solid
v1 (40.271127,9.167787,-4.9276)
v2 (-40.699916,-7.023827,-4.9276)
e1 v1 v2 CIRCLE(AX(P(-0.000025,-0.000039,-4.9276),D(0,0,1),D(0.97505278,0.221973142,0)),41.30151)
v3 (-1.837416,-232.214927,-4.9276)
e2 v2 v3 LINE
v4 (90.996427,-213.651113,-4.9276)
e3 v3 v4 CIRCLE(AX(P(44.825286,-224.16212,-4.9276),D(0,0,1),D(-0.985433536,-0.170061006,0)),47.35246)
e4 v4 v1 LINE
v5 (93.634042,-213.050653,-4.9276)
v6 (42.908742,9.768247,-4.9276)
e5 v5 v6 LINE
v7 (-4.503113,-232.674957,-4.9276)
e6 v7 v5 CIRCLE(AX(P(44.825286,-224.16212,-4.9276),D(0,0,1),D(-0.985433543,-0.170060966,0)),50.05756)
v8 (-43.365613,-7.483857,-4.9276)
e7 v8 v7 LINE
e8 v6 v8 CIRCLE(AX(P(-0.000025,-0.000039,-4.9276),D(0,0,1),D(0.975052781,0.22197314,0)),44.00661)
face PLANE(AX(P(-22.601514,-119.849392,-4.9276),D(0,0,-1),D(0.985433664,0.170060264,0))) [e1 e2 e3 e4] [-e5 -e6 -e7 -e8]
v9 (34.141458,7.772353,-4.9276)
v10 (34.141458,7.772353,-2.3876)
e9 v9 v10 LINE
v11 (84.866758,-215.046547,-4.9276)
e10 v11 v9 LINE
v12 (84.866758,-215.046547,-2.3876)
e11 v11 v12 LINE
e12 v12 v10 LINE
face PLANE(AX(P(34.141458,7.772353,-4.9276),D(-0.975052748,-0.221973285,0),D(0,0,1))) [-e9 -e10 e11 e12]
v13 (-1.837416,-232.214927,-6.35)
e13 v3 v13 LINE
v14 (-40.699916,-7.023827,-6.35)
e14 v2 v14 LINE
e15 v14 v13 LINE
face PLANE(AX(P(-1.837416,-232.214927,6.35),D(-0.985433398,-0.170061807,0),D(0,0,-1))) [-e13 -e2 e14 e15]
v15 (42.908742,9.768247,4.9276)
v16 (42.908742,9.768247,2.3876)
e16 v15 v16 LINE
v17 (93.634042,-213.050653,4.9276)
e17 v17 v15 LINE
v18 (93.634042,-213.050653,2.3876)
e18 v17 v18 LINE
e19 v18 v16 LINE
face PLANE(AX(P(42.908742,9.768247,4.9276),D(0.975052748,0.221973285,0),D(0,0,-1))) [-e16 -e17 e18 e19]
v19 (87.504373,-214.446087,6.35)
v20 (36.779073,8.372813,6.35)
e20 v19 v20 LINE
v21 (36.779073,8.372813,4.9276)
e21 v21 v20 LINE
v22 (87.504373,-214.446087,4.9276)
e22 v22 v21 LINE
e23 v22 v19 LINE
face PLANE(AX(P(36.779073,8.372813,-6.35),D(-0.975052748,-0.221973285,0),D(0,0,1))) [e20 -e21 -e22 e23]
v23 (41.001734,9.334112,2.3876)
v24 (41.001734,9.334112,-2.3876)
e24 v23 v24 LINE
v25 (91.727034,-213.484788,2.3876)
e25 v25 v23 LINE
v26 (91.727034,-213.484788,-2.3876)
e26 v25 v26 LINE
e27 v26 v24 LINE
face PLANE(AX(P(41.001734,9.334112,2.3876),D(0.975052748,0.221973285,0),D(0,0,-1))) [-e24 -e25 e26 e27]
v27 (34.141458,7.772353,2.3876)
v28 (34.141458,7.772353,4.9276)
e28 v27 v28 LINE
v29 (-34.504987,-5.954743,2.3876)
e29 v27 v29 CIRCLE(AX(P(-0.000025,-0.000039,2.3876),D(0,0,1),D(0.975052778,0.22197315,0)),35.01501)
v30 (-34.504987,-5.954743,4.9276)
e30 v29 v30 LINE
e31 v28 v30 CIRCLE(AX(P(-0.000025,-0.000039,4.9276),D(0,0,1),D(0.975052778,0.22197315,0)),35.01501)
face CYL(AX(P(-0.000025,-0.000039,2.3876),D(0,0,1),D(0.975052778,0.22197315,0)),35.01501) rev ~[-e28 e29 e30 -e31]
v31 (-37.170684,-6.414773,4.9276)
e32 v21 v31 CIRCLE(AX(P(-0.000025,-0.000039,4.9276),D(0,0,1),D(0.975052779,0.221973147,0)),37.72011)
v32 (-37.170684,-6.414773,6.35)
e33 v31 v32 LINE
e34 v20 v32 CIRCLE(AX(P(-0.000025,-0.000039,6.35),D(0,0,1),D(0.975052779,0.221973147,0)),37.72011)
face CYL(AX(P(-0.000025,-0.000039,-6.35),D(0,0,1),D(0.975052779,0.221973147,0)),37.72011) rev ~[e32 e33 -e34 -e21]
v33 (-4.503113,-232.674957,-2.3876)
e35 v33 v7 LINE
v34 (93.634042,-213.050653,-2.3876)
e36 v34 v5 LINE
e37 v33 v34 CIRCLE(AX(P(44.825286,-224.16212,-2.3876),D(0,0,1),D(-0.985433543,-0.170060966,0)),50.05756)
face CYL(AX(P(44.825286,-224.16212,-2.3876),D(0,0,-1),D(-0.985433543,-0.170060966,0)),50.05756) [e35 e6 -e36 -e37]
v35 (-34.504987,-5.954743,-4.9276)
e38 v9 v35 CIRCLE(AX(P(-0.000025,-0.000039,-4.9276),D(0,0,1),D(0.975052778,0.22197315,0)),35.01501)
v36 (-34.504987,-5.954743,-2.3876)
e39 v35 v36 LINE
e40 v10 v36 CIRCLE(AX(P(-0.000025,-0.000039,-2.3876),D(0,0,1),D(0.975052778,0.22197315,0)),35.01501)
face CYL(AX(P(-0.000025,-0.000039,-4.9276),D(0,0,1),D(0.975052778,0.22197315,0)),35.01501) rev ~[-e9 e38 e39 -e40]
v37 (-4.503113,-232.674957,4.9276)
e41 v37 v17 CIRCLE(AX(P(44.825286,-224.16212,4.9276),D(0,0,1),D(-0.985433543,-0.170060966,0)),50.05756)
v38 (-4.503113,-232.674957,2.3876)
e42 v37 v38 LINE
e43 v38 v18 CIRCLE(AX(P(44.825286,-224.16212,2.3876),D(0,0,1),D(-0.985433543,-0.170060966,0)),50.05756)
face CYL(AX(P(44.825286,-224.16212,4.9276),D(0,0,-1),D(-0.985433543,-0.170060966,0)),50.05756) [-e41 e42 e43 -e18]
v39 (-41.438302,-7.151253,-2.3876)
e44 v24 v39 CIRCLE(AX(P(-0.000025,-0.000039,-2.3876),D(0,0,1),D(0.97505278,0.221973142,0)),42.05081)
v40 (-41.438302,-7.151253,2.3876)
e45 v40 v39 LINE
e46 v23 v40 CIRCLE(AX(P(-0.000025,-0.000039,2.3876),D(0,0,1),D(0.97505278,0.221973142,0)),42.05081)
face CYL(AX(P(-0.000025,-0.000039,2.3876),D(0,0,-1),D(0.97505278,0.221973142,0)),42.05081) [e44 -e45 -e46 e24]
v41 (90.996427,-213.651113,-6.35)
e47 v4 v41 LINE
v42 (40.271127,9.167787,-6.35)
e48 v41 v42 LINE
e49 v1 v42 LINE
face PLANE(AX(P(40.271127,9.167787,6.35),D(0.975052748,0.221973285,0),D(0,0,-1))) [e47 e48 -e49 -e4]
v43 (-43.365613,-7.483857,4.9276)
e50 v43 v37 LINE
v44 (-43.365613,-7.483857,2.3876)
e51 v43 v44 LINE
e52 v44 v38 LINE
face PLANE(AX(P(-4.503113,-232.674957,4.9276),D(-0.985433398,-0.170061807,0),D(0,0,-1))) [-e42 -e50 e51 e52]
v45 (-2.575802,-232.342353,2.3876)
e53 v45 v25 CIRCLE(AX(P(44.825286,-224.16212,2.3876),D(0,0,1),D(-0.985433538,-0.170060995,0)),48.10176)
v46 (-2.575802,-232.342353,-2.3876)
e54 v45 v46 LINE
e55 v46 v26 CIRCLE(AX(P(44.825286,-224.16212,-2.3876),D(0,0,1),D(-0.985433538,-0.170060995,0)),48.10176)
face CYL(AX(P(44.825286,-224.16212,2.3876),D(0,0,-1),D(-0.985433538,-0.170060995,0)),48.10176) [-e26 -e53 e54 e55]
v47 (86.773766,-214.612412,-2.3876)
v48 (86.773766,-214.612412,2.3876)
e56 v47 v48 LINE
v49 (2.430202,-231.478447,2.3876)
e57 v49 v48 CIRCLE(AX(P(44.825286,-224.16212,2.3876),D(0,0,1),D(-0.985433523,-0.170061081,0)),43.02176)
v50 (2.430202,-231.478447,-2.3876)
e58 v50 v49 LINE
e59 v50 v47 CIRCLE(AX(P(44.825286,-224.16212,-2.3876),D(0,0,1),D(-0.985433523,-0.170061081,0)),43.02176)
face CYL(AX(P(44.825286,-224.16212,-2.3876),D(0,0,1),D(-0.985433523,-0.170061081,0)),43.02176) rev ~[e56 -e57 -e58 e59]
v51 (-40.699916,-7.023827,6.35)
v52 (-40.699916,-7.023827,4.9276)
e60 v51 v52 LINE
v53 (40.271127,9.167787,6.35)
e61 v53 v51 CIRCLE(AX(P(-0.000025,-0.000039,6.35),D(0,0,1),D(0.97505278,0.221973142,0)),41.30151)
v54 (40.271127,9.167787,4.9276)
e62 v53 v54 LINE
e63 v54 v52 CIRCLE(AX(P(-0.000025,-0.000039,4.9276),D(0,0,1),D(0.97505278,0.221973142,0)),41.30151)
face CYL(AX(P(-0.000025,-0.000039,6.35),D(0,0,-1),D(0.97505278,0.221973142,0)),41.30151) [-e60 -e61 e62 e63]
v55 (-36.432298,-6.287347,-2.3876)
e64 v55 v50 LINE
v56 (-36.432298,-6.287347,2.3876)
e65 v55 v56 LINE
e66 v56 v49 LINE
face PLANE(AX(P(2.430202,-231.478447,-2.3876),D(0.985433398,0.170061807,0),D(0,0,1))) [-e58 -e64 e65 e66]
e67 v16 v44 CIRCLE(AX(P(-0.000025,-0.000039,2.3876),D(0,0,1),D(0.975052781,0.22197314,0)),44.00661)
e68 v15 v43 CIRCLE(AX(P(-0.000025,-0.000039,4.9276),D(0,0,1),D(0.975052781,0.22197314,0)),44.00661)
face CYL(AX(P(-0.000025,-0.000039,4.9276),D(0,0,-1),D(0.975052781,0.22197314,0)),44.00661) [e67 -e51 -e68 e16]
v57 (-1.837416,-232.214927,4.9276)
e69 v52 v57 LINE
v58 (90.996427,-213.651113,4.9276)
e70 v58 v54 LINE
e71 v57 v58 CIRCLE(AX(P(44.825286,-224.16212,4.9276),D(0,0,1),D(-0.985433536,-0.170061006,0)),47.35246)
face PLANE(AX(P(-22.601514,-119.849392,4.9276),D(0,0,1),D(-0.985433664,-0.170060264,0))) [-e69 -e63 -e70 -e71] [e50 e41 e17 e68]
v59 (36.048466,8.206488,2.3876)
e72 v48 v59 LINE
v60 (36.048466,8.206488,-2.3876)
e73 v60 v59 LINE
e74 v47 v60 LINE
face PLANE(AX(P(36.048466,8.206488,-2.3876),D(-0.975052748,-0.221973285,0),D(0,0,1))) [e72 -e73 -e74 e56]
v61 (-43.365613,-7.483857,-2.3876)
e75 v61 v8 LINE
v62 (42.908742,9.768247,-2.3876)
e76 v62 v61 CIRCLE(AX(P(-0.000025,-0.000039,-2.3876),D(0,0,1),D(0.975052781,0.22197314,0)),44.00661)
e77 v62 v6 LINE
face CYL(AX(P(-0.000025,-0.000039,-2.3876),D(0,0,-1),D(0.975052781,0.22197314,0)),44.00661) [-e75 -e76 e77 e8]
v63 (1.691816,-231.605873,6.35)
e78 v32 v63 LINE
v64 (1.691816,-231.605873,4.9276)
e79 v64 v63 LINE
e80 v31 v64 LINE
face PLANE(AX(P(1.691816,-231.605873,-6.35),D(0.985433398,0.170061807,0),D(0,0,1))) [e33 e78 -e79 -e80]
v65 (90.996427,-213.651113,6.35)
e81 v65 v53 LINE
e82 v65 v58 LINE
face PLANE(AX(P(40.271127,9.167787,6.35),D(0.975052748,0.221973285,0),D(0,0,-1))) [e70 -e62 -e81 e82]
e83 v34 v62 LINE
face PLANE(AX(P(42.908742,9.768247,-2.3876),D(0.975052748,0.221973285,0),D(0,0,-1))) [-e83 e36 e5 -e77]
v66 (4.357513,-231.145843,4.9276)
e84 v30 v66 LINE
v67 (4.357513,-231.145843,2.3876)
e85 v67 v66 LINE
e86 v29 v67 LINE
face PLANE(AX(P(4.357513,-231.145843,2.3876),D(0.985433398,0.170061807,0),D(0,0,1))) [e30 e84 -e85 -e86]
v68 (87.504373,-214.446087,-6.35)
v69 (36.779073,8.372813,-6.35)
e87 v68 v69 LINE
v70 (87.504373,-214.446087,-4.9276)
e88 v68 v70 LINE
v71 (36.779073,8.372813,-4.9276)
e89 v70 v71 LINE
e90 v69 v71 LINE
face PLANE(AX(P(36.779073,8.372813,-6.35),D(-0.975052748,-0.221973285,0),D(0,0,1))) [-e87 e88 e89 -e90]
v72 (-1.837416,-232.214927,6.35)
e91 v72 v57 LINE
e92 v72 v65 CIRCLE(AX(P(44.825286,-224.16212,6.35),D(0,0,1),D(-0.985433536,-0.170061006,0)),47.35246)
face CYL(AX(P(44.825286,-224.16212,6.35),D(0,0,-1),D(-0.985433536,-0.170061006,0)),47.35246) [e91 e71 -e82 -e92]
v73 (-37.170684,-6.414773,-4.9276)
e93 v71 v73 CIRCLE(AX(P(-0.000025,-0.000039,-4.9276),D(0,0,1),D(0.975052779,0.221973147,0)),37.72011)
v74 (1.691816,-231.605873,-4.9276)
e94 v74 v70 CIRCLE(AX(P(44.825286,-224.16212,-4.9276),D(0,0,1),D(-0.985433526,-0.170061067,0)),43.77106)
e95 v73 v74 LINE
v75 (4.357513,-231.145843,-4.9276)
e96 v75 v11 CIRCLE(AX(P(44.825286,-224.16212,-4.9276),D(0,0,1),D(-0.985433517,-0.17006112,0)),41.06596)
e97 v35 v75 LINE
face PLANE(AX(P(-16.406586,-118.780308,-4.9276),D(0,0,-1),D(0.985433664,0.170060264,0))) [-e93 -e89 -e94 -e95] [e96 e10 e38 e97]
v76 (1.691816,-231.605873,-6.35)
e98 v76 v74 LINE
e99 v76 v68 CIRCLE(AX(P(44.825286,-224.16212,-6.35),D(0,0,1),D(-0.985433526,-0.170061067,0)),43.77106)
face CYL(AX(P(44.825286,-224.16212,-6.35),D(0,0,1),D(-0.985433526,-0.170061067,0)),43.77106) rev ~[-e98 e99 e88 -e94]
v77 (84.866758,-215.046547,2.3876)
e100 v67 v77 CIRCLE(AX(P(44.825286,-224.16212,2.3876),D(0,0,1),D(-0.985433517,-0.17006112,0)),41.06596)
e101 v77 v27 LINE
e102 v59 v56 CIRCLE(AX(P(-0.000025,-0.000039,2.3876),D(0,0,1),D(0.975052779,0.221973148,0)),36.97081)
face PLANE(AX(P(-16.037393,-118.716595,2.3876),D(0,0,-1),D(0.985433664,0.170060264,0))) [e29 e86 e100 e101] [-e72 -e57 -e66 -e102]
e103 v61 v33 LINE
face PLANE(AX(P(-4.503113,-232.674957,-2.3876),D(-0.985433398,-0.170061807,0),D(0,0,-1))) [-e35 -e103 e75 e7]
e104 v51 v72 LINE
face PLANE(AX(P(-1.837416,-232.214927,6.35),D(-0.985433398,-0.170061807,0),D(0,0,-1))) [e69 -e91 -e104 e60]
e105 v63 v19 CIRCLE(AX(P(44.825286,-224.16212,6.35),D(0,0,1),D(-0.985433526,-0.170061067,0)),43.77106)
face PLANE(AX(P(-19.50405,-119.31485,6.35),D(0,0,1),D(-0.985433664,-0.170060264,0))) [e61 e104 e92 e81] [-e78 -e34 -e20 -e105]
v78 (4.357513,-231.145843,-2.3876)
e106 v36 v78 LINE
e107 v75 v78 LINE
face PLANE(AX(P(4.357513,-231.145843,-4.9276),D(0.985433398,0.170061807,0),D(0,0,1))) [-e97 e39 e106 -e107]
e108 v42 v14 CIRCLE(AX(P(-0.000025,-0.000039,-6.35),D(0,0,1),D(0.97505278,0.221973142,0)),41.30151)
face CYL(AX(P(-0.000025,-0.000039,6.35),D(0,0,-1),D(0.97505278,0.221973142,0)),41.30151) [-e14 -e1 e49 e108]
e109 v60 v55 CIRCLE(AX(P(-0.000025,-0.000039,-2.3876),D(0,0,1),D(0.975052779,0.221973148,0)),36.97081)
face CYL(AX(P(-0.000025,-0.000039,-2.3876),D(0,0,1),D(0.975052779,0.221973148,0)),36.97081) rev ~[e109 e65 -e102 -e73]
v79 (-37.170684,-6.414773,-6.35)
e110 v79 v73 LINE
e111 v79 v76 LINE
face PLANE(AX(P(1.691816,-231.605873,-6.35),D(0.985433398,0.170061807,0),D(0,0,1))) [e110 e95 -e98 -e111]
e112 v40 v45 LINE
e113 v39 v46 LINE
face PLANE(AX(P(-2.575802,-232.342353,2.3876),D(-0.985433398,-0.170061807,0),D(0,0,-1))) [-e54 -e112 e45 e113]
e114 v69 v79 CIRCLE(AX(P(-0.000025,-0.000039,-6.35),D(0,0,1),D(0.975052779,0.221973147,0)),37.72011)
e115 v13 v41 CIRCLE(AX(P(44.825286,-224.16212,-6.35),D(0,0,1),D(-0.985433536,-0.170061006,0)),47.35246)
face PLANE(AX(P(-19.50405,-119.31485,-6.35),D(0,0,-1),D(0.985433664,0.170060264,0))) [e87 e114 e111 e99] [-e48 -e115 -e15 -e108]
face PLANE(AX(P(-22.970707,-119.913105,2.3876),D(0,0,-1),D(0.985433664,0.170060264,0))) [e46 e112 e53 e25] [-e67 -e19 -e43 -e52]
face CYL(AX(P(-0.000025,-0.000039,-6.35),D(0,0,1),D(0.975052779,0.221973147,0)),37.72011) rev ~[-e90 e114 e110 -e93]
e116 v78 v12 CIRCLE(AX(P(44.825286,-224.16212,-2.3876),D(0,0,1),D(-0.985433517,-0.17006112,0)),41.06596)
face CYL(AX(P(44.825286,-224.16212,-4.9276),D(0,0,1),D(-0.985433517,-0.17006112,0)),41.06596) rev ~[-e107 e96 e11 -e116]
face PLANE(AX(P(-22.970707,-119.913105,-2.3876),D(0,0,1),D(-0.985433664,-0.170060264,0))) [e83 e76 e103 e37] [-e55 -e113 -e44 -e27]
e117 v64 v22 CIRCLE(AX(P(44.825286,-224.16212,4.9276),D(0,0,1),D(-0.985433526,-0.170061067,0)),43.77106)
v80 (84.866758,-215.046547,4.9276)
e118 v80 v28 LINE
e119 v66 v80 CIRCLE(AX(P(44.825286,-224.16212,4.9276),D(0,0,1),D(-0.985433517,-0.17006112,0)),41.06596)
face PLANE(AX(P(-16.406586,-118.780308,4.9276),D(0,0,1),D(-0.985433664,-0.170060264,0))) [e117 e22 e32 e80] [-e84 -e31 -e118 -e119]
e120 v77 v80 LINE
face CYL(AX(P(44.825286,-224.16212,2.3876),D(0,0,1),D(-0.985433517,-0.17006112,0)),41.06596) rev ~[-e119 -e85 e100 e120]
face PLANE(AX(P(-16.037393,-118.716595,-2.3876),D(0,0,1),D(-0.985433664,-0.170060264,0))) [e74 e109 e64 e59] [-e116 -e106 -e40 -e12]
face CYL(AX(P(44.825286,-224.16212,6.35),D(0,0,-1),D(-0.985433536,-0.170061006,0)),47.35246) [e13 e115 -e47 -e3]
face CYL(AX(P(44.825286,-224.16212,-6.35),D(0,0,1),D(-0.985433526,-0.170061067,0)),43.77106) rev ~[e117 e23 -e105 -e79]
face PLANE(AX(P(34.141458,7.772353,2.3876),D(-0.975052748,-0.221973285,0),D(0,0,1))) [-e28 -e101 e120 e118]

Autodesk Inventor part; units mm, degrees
ref_plane "Work Plane2" through (44.8253, -224.1621, 0) normal (-1, 0, 0) x (0, 0, 1)
ref_plane "Work Plane3" through (0, 0, 0) normal (0.0925318, -0.9957097, 0) x (0, 0, 1)
sketch "Path" plane through (0, 0, 0) normal (0, 0, 1) x (1, 0, 0)
  arc A0 (-0.0728, -231.9104) -> (89.2504, -214.0486) centre (44.8253, -224.1621) ccw
  arc A1 (38.5251, 8.7703) -> (-38.9353, -6.7193) centre (0, 0) ccw
  line L0 (38.5251, 8.7703) -> (89.2504, -214.0486)
  line L1 (-0.0728, -231.9104) -> (-38.9353, -6.7193)
  dimension "d31" = 8.9916
ref_plane "Section Plane" through (89.2504, -214.0486, 0) normal (-0.2219731, 0.9750528, 0) x (0, 0, 1)
sketch "Section Sketch" plane through (89.2504, -214.0486, 0) normal (-0.2219731, 0.9750528, 0) x (0, 0, 1)
  line L0 (-6.35, -1.7907) -> (6.35, -1.7907)
  line L1 (6.35, -1.7907) -> (6.35, 1.7907)
  line L2 (6.35, 1.7907) -> (-6.35, 1.7907)
  line L3 (-6.35, 1.7907) -> (-6.35, -1.7907)
  line L4 (-2.3876, -2.54) -> (2.3876, -2.54)
  line L5 (2.3876, -2.54) -> (2.3876, 2.54)
  line L6 (2.3876, 2.54) -> (-2.3876, 2.54)
  line L7 (-2.3876, 2.54) -> (-2.3876, -2.54)
  line L8 (-2.3876, 0) -> (2.3876, 0) construction
  line L9 (-4.9276, -4.4958) -> (-2.3876, -4.4958)
  line L10 (-2.3876, -4.4958) -> (-2.3876, 4.4958)
  line L11 (-2.3876, 4.4958) -> (-4.9276, 4.4958)
  line L12 (-4.9276, 4.4958) -> (-4.9276, -4.4958)
  line L13 (2.3876, -4.4958) -> (4.9276, -4.4958)
  line L14 (4.9276, -4.4958) -> (4.9276, 4.4958)
  line L15 (4.9276, 4.4958) -> (2.3876, 4.4958)
  line L16 (2.3876, 4.4958) -> (2.3876, -4.4958)
  line L17 (-6.35, 0) -> (6.35, 0) construction
  point P0 (0, 0)
  point P1 (0, 0)
  dimension "d21" = 3.5814
  dimension "d22" = 5.08
  dimension "d23" = 4.7752
  dimension "d24" = 2.54
  dimension "d31" = 8.9916
  dimension "d32" = 12.7
sweep "Solid" add profiles "Section Sketch" path "Path"
pattern_of_one "Strand Pattern"
equation "\"d21\" = da_d2"
equation "\"d22\" = da_d1"
equation "\"d23\" = da_b1"
equation "\"d24\" = da_t1 + da_t2"
equation "\"d30\" = da_pt"
equation "\"da_p\" = 9.525"
equation "\"da_b1\" = 4.7752"
equation "\"da_h2\" = 8.9916"
equation "\"da_h3\" = 7.7978"
equation "\"da_d1\" = 5.08"
equation "\"da_d2\" = 3.5814"
equation "\"da_pt\" = 10.1346"
equation "\"da_b\" = 12.7"
equation "\"da_t1\" = 1.27"
equation "\"da_t2\" = 1.27"
properties part number "Roller Chain"
